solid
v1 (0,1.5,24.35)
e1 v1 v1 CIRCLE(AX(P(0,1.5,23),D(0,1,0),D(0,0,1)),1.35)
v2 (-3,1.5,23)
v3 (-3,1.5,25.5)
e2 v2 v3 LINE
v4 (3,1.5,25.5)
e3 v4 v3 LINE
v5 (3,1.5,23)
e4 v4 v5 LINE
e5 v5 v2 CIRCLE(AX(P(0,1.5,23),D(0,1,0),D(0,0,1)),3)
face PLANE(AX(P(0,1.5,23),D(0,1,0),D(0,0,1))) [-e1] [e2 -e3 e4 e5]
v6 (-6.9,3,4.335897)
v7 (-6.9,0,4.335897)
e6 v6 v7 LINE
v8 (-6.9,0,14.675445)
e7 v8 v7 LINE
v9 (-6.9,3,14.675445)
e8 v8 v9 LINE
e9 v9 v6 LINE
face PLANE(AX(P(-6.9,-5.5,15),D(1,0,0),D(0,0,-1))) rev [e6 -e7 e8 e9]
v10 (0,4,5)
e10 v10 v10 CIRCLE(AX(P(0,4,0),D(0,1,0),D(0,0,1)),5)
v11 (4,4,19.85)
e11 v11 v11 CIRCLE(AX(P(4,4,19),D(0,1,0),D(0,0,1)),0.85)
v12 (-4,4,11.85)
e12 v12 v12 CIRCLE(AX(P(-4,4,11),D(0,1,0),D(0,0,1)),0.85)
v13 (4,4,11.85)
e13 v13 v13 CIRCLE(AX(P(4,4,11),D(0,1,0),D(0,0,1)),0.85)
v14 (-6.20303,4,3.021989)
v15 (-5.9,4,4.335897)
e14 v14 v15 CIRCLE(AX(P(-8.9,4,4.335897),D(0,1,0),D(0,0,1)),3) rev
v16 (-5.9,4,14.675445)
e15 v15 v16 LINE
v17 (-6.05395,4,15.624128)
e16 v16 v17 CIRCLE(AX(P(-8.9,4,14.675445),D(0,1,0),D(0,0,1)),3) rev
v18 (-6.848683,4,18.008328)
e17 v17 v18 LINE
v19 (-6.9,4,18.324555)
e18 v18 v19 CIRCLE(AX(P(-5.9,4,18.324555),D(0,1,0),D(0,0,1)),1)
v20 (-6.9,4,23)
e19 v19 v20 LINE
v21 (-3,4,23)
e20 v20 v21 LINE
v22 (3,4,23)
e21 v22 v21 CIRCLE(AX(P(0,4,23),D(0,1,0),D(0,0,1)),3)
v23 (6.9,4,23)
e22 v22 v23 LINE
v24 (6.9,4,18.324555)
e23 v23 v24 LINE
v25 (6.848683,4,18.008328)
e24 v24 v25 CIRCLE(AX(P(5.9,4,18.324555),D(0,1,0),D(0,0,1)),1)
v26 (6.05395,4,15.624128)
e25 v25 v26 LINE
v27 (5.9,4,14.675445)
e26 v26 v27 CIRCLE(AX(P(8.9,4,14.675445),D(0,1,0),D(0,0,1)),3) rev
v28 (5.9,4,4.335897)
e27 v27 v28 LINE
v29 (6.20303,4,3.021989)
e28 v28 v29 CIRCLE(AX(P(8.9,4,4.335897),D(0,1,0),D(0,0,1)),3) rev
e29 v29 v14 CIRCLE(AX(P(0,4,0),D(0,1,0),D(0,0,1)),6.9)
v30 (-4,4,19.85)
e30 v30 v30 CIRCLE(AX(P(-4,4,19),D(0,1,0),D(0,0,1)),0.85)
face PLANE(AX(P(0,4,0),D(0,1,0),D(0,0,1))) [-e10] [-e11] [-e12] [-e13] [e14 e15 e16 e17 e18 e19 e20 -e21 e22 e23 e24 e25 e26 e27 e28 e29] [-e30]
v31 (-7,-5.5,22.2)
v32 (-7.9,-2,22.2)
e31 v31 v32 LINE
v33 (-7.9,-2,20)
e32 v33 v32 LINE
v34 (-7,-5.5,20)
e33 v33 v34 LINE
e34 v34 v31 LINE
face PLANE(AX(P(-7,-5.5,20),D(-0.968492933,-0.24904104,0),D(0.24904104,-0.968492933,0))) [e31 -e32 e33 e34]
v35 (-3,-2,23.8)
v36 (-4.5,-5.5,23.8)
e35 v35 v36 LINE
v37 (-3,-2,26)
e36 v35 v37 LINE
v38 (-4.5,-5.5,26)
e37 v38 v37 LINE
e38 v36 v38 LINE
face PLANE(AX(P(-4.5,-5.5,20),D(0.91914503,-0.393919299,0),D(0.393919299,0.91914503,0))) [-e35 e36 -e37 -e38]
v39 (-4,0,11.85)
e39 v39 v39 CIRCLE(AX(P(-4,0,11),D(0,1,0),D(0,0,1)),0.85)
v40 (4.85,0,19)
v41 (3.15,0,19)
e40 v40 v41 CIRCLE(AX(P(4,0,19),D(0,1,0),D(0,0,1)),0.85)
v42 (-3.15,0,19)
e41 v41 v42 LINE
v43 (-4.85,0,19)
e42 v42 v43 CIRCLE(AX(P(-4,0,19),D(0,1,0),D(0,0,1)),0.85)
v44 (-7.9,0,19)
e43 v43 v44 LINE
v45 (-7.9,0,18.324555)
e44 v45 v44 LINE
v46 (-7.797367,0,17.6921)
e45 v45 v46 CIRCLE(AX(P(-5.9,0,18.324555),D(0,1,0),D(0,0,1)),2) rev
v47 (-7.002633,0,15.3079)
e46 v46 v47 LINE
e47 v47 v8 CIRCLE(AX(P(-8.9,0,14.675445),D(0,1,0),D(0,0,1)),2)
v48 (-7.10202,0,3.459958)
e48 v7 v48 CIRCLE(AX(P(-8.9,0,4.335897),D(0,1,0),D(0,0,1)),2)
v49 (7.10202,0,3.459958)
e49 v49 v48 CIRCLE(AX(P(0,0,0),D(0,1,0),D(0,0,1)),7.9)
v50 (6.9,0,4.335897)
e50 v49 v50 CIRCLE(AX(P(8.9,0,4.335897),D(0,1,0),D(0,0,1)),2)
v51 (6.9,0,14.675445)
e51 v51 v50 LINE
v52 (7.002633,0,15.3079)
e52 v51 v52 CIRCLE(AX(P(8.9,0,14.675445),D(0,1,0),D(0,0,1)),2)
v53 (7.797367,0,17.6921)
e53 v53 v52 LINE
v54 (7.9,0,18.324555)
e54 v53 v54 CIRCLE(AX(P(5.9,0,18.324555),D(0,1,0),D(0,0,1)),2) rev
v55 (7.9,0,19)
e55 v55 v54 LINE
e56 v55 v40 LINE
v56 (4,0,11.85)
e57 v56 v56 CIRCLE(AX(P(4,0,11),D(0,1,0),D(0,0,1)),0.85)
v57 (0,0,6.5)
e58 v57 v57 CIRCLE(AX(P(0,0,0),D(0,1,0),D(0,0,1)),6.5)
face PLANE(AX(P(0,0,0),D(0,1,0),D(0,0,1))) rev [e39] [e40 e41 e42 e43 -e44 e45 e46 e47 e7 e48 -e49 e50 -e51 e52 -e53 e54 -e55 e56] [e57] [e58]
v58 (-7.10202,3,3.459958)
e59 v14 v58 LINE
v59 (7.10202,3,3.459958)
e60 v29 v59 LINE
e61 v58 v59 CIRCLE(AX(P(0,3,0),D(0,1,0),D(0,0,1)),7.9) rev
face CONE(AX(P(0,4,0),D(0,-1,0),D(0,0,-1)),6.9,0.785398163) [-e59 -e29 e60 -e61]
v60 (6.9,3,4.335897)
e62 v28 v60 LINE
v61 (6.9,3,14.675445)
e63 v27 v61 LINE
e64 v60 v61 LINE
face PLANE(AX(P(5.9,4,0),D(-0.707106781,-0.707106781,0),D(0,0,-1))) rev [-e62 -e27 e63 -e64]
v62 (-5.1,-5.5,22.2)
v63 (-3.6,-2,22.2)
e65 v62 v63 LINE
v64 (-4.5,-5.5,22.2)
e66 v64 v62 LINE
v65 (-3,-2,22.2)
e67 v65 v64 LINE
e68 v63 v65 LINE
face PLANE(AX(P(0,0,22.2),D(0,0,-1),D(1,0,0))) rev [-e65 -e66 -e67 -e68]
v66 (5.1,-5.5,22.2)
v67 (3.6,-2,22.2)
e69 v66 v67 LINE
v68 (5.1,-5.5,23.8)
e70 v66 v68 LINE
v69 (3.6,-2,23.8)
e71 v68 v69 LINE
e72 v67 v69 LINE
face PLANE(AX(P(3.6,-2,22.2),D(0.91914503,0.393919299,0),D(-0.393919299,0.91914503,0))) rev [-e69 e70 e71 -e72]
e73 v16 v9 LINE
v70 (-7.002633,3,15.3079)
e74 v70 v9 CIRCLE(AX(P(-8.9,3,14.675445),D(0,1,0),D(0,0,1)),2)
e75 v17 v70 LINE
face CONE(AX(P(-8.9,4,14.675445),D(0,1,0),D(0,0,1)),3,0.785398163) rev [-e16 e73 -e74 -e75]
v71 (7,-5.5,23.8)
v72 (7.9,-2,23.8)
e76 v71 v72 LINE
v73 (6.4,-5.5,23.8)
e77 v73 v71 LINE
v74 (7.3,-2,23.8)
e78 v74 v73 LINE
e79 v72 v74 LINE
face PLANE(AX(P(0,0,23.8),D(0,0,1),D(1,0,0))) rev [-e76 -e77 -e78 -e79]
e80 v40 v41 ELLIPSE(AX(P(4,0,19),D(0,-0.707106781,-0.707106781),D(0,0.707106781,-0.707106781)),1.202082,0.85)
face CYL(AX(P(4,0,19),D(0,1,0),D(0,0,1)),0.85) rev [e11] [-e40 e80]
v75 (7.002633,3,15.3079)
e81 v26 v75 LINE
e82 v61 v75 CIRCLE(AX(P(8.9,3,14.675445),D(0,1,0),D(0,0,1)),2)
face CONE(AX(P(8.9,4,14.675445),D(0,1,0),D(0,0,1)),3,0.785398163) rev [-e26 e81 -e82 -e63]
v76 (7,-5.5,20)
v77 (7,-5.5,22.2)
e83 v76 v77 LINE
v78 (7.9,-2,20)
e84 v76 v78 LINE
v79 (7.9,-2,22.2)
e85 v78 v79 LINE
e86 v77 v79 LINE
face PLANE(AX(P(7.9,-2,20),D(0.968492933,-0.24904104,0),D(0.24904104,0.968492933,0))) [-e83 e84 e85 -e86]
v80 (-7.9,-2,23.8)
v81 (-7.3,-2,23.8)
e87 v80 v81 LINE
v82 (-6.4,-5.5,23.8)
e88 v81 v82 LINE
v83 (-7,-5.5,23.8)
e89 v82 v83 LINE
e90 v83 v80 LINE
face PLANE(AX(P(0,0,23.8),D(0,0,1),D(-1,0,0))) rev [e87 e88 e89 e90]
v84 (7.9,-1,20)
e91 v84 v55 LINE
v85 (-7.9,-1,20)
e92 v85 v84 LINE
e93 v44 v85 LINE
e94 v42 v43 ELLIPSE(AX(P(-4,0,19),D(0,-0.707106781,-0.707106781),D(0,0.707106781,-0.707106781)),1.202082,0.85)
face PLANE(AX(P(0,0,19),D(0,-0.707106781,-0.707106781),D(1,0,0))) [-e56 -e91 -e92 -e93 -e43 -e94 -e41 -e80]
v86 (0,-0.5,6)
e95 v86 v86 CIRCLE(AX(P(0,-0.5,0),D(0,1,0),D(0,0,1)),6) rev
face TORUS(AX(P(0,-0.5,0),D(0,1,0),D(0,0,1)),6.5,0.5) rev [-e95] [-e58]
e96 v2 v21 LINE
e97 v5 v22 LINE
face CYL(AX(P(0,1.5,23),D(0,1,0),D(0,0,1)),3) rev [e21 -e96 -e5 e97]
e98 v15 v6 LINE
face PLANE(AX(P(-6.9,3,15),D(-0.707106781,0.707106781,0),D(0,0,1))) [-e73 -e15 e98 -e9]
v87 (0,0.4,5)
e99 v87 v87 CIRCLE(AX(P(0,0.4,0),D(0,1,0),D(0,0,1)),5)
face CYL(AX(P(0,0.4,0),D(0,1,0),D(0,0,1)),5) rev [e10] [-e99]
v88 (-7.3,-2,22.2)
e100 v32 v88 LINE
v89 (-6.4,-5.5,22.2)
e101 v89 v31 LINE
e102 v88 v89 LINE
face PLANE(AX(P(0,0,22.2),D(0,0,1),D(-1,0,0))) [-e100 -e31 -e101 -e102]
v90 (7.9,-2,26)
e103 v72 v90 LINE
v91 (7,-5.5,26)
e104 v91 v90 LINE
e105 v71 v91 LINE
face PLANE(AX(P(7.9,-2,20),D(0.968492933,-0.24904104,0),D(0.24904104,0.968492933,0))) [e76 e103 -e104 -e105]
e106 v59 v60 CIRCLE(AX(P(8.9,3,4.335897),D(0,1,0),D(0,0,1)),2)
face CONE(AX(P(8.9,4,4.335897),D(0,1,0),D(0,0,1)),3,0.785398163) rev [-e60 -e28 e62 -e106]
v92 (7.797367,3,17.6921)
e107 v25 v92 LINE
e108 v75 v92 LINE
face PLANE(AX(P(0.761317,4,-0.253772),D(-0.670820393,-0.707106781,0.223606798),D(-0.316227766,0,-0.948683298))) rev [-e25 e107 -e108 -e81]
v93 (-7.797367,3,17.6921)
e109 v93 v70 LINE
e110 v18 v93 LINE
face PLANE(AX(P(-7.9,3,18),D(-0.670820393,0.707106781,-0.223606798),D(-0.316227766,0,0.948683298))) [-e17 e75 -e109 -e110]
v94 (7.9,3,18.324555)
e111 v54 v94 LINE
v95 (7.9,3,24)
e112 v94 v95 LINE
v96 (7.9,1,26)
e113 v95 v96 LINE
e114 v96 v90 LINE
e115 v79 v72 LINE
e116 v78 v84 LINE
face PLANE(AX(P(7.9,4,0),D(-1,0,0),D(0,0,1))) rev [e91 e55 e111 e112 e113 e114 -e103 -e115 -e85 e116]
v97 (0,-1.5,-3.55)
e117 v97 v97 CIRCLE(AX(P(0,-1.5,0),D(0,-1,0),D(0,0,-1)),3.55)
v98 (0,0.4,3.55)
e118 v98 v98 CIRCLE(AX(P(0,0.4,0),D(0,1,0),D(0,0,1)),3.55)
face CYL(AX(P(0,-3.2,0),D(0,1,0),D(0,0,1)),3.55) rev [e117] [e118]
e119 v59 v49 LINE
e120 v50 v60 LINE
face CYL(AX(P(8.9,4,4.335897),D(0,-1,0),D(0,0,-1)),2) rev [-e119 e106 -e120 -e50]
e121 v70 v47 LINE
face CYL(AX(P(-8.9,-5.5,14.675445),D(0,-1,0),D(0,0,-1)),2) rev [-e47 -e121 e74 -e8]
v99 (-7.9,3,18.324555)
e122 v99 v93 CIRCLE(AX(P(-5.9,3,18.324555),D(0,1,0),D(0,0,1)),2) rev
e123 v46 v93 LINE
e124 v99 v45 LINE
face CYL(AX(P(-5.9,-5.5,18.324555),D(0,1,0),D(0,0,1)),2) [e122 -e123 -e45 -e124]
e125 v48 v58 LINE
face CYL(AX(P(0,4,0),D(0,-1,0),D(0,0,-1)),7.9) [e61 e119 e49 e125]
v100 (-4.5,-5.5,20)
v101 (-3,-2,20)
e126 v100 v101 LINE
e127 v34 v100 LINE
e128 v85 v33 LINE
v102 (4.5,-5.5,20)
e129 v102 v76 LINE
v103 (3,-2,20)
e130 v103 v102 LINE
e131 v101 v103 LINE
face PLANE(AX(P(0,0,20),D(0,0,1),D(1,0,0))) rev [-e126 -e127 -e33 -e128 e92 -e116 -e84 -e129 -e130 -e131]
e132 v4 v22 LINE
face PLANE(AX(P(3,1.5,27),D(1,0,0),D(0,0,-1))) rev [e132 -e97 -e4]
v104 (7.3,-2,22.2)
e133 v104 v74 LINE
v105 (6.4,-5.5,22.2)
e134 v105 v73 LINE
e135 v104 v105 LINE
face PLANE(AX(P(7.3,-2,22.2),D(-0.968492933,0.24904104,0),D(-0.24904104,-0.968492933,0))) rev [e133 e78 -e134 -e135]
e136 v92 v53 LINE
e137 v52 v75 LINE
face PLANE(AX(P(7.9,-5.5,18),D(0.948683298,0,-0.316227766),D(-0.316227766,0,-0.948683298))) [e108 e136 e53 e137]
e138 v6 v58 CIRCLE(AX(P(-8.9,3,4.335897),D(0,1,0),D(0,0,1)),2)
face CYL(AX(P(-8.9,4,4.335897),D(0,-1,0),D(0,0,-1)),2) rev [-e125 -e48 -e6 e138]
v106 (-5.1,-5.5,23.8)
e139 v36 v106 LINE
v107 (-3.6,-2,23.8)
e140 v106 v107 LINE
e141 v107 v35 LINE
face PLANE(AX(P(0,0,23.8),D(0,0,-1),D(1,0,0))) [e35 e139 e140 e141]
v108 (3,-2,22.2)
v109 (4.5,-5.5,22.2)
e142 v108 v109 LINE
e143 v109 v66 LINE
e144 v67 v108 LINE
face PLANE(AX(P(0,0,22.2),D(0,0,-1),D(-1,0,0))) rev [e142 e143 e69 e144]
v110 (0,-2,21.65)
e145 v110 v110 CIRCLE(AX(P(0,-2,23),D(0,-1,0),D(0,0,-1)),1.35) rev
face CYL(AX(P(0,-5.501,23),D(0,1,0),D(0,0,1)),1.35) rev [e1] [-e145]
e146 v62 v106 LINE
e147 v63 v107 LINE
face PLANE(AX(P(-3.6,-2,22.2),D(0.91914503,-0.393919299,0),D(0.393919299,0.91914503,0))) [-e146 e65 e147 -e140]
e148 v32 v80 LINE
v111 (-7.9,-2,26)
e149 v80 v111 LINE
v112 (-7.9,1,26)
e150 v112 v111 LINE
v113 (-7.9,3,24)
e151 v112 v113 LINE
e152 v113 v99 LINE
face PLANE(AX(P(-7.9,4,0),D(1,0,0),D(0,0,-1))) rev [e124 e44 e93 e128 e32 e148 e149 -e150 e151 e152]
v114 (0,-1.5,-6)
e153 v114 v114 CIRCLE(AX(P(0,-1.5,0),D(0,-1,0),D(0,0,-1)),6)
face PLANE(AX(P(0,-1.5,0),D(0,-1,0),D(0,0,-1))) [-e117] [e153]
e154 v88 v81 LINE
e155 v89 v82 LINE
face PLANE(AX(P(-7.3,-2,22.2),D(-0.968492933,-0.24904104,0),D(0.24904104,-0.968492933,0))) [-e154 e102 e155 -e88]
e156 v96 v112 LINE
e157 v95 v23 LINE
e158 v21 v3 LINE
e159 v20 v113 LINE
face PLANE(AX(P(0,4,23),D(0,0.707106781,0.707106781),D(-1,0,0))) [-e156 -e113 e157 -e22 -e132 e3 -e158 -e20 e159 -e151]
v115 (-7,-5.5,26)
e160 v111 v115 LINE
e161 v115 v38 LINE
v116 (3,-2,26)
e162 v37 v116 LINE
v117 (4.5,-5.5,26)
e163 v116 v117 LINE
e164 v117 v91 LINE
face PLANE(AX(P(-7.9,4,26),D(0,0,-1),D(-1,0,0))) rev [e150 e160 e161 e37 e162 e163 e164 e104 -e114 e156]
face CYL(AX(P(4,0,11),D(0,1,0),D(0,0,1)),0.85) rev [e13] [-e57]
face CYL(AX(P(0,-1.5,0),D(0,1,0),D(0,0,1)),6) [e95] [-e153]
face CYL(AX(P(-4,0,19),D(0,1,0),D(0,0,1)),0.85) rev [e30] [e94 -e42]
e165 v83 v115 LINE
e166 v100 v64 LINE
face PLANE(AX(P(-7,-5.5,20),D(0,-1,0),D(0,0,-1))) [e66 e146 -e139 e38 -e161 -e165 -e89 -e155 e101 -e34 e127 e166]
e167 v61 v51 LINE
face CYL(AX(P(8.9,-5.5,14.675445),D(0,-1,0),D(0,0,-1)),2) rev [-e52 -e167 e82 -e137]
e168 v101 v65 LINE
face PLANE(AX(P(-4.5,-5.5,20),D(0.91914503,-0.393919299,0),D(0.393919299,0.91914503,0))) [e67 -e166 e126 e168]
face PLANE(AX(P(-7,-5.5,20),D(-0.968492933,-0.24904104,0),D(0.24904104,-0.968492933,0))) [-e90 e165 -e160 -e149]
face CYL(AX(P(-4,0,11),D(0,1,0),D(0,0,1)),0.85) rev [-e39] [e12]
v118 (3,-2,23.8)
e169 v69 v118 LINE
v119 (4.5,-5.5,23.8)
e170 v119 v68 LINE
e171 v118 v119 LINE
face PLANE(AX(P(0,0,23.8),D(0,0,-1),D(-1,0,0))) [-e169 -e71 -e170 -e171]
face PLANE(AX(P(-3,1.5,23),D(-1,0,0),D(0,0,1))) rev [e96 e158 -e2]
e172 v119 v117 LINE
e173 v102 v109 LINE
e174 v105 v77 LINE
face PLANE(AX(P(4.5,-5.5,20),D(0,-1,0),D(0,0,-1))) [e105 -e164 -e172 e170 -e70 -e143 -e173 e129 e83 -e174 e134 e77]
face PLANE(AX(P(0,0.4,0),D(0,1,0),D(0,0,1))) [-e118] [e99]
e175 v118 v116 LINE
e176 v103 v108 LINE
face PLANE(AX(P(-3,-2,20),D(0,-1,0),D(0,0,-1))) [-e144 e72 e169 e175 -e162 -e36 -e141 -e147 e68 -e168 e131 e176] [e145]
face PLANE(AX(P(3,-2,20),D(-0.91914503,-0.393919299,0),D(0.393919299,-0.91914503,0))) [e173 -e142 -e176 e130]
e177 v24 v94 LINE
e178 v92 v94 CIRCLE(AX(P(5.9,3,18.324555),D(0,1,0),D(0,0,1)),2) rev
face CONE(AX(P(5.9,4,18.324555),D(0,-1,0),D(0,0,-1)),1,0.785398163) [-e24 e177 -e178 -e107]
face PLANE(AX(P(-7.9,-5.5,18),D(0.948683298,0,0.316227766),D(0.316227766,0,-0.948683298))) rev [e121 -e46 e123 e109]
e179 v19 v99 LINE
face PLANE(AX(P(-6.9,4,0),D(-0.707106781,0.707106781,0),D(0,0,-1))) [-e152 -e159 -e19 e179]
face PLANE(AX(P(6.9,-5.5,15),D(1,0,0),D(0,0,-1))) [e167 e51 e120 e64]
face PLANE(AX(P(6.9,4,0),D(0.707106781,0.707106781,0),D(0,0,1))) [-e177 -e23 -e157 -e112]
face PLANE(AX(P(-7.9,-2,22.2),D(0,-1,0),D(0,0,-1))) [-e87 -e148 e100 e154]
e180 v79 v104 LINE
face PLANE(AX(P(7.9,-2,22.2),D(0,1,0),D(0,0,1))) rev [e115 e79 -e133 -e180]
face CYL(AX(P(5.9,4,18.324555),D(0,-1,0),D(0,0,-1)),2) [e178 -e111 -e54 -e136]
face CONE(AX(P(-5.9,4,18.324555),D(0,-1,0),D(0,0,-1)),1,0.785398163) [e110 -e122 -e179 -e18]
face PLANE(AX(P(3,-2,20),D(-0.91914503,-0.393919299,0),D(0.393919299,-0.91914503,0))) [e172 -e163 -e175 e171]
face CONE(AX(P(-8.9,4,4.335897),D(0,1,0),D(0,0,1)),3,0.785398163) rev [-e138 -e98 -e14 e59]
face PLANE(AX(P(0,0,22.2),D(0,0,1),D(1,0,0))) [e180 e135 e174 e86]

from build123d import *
from build123d.topology import SkipClean

# Parameters (mm, degrees)
EXTRUDE_1_DEPTH        = 4
EXTRUDE_3_DEPTH        = 6
CHAMFER_1_SIZE         = 3
SKETCH_5_R             = 0.85
CUT_EXTRUDE_1_DEPTH    = 4
PATTERN_LINEAR_1_COUNT = 2
PATTERN_LINEAR_1_PITCH = 8
CUT_EXTRUDE_2_DEPTH    = 2.5
CUT_EXTRUDE_3_REACH    = 30.061
SKETCH_7_R             = 1.35
SKETCH_8_R             = 6
EXTRUDE_4_DEPTH        = 1.5
FILLET_1_R             = 0.5
SKETCH_9_R             = 5
CUT_EXTRUDE_4_DEPTH    = 3.6
SKETCH_10_R            = 3.55
CUT_EXTRUDE_5_DEPTH    = 3.6
CUT_EXTRUDE_6_DEPTH    = 0.8
CUT_EXTRUDE_7_DEPTH    = 29.786455148
FILLET_2_R             = 2
CHAMFER_2_SIZE         = 1


with BuildPart() as part:
    # ｽｹｯﾁ1 → ﾎﾞｽ - 押し出し1 (new body)
    with BuildSketch(Plane(origin=(0, 0, 0), x_dir=(1, 0, 0), z_dir=(0, 1, 0))):
        with BuildLine():
            Line((-7.9, 0), (-7.9, -26))
            Line((-7.9, -26), (7.9, -26))
            Line((7.9, -26), (7.9, 0))
            ThreePointArc((7.9, 0), (0, 7.9), (-7.9, 0))
        make_face()
    extrude(amount=EXTRUDE_1_DEPTH)

    # ｽｹｯﾁ4 → ﾎﾞｽ - 押し出し3 (add)
    with BuildSketch(Plane.XY.offset(26)):
        Polygon((-7, -5.5), (-4.5, -5.5), (-3, -2), (3, -2), (4.5, -5.5), (7, -5.5), (7.9, -2), (7.9, 0), (-7.9, 0), (-7.9, -2), align=None)
    extrude(amount=-EXTRUDE_3_DEPTH)

    # 面取り1
    chamfer_1_edges = [part.edges().sort_by_distance(p)[0] for p in [
        (0, 4, 26),
    ]]
    chamfer(chamfer_1_edges, length=CHAMFER_1_SIZE)

    # ｽｹｯﾁ5 → ｶｯﾄ - 押し出し1 (cut)
    with BuildSketch(Plane(origin=(0, 4, 0), x_dir=(1, 0, 0), z_dir=(0, 1, 0))):
        with Locations(Location((-4, -19, 0), (0, 0, 270))):
            Circle(SKETCH_5_R)
        with Locations(Location((4, -19, 0), (0, 0, 270))):
            Circle(SKETCH_5_R)
    cut_extrude_1 = extrude(amount=-CUT_EXTRUDE_1_DEPTH, mode=Mode.SUBTRACT)

    # 直線ﾊﾟﾀｰﾝ1: ｶｯﾄ - 押し出し1 ×2
    with Locations(*[(0, 0, -i * PATTERN_LINEAR_1_PITCH) for i in range(1, PATTERN_LINEAR_1_COUNT)]):
        add(cut_extrude_1, mode=Mode.SUBTRACT)

    # ｽｹｯﾁ6 → ｶｯﾄ - 押し出し2 (cut)
    with BuildSketch(Plane(origin=(0, 4, 0), x_dir=(1, 0, 0), z_dir=(0, 1, 0))):
        with BuildLine():
            Line((-3, -23), (-3, -27))
            Line((-3, -27), (3, -27))
            Line((3, -27), (3, -23))
            ThreePointArc((3, -23), (0, -20), (-3, -23))
        make_face()
    extrude(amount=-CUT_EXTRUDE_2_DEPTH, mode=Mode.SUBTRACT)

    # ｽｹｯﾁ7 → ｶｯﾄ - 押し出し3 (cut, up to next)
    with BuildSketch(Plane(origin=(0, 1.5, 0), x_dir=(1, 0, 0), z_dir=(0, 1, 0)), mode=Mode.PRIVATE) as cut_extrude_3_sk1:
        with Locations(Location((0, -23, 0), (0, 0, 270))):
            Circle(SKETCH_7_R)
    cut_extrude_3_tool1 = extrude(cut_extrude_3_sk1.sketch, amount=-CUT_EXTRUDE_3_REACH, mode=Mode.PRIVATE) & part.part
    add(cut_extrude_3_tool1.solids().sort_by_distance((0, 1.5, 23))[0], mode=Mode.SUBTRACT)

    # ｽｹｯﾁ8 → ﾎﾞｽ - 押し出し4 (add)
    with BuildSketch(Plane.XZ):
        with Locations(Location((0, 0, 0), (0, 0, 90))):
            Circle(SKETCH_8_R)
    extrude(amount=EXTRUDE_4_DEPTH)

    # ﾌｨﾚｯﾄ1
    fillet_1_edges = [part.edges().sort_by_distance(p)[0] for p in [
        (0, 0, -6),
    ]]
    fillet(fillet_1_edges, radius=FILLET_1_R)

    # ｽｹｯﾁ9 → ｶｯﾄ - 押し出し4 (cut)
    with BuildSketch(Plane(origin=(0, 4, 0), x_dir=(1, 0, 0), z_dir=(0, 1, 0))):
        with Locations(Location((0, 0, 0), (0, 0, 270))):
            Circle(SKETCH_9_R)
    extrude(amount=-CUT_EXTRUDE_4_DEPTH, mode=Mode.SUBTRACT)

    # ｽｹｯﾁ10 → ｶｯﾄ - 押し出し5 (cut)
    with BuildSketch(Plane(origin=(0, 0.4, 0), x_dir=(1, 0, 0), z_dir=(0, 1, 0))):
        with Locations(Location((0, 0, 0), (0, 0, 270))):
            Circle(SKETCH_10_R)
    extrude(amount=-CUT_EXTRUDE_5_DEPTH, mode=Mode.SUBTRACT)

    # ｽｹｯﾁ11 → ｶｯﾄ - 押し出し6 (cut, symmetric)
    with BuildSketch(Plane.XY.offset(23)):
        Polygon((3, -2), (4.5, -5.5), (5.1, -5.5), (3.6, -2), align=None)
        Polygon((7.9, -2), (7, -5.5), (6.4, -5.5), (7.3, -2), align=None)
    cut_extrude_6 = extrude(amount=CUT_EXTRUDE_6_DEPTH, both=True, mode=Mode.SUBTRACT)

    # ﾐﾗｰ1: ｶｯﾄ - 押し出し6 across plane
    add(cut_extrude_6.mirror(Plane(origin=(0, 0, 0), x_dir=(0, 0, 1), z_dir=(1, 0, 0))), mode=Mode.SUBTRACT)

    # ｽｹｯﾁ12 → ｶｯﾄ - 押し出し7 (cut, through all)
    with SkipClean():  # the faces are left unmerged after this step: merging them gives an invalid solid
        with BuildSketch(Plane(origin=(0, 4, 0), x_dir=(1, 0, 0), z_dir=(0, 1, 0))):
            with BuildLine():
                Line((-7.9, -18), (-6.9, -15))
                Line((-6.9, -15), (-6.9, -3.847076812))
                ThreePointArc((-6.9, -3.847076812), (-7.645913941, -1.987460691), (-7.9, 0))
                Line((-7.9, 0), (-7.9, -18))
            make_face()
        cut_extrude_7 = extrude(amount=-CUT_EXTRUDE_7_DEPTH, mode=Mode.SUBTRACT)

    # ﾐﾗｰ2: ｶｯﾄ - 押し出し7 across plane
    with SkipClean():  # the faces are left unmerged after this step: merging them gives an invalid solid
        add(cut_extrude_7.mirror(Plane(origin=(0, 0, 0), x_dir=(0, 0, 1), z_dir=(1, 0, 0))), mode=Mode.SUBTRACT)

    # ﾌｨﾚｯﾄ2
    fillet_2_edges = [part.edges().sort_by_distance(p)[0] for p in [
        (-7.9, 2, 18),
        (-6.9, 2, 3.847076812),
        (-6.9, 2, 15),
        (7.9, 2, 18),
        (6.9, 2, 15),
        (6.9, 2, 3.847076812),
    ]]
    fillet(fillet_2_edges, radius=FILLET_2_R)

    # 面取り2
    # the kernel refuses this chamfer: 1 mm, written as the material it adds along each edge
    with BuildSketch(Plane(origin=(7.9, 0, 20), x_dir=(0, 0.02749587661058639, -0.9996219169112968), z_dir=(-1, 0, 0))) as chamfer_2_piece_1_section:
        Polygon((CHAMFER_2_SIZE * 0.999621916911, CHAMFER_2_SIZE * 0.0274958766106), (-CHAMFER_2_SIZE * 0.0274958766106, CHAMFER_2_SIZE * 0.999621916911), (0, 0), align=None)
    chamfer_2_piece_1 = extrude(amount=15.8, mode=Mode.PRIVATE)
    chamfer_2_piece_1 = chamfer_2_piece_1 - Plane(origin=(-4, -0.34097177, 19), x_dir=(0, 0, 1), z_dir=(0, 1, 0)) * Cylinder(0.85, 36, mode=Mode.PRIVATE)
    chamfer_2_piece_1 = chamfer_2_piece_1 - Plane(origin=(4, -0.34097177, 19), x_dir=(0, 0, 1), z_dir=(0, 1, 0)) * Cylinder(0.85, 36, mode=Mode.PRIVATE)
    add(chamfer_2_piece_1)
    # the kernel refuses this chamfer: 1 mm, written as the material it takes off along each edge
    with BuildSketch(Plane(origin=(-7.9, 4, 18.32455532), x_dir=(-0.027495876610586487, -0.9996219169112968, 0), z_dir=(0, 0, 1)), Plane(origin=(7.9, 4, 25.571682988), x_dir=(0.027495876610586487, -0.9996219169112968, 0), z_dir=(0, 0, -1))) as chamfer_2_2_piece_1:
        Polygon((CHAMFER_2_SIZE * 0.999621916911, CHAMFER_2_SIZE * 0.0274958766106), (-CHAMFER_2_SIZE * 0.0274958766106, CHAMFER_2_SIZE * 0.999621916911), (0, 0), align=None)
    extrude(amount=7.247127668, mode=Mode.SUBTRACT)
    with BuildSketch(Plane(origin=(0, 4, 0), x_dir=(1, 0, 0), z_dir=(0, 0, 1))) as chamfer_2_2_piece_2:
        Polygon((7.9, -CHAMFER_2_SIZE), (7.9 - CHAMFER_2_SIZE, 0), (7.9, 0), align=None)
    revolve(axis=Axis((0, 4, 0), (0, 1, 0)), revolution_arc=180, mode=Mode.SUBTRACT)
    with BuildSketch(Plane(origin=(-5.9, 4, 18.32455532), x_dir=(-1, 0, 0), z_dir=(0, 0, 1))) as chamfer_2_2_piece_3:
        Polygon((2, CHAMFER_2_SIZE), (2 - CHAMFER_2_SIZE, 0), (2, 0), align=None)
    revolve(axis=Axis((-5.9, 4, 18.32455532), (0, -1, 0)), revolution_arc=18.434948823, mode=Mode.SUBTRACT)
    with BuildSketch(Plane(origin=(-7.797366596, 4, 17.692099788), x_dir=(-0.026084878905720917, -0.9996219169112968, -0.008694959635240323), z_dir=(0.31622776601683844, 0, -0.9486832980505137))) as chamfer_2_2_piece_4:
        Polygon((CHAMFER_2_SIZE * 0.999621916911, -CHAMFER_2_SIZE * 0.0274958766106), (-CHAMFER_2_SIZE * 0.0274958766106, -CHAMFER_2_SIZE * 0.999621916911), (0, 0), align=None)
    extrude(amount=2.513167019, mode=Mode.SUBTRACT)
    with BuildSketch(Plane(origin=(-8.9, 4, 14.67544468), x_dir=(0.9486832980505138, 0, 0.31622776601683794), z_dir=(-0.31622776601683794, 0, 0.9486832980505138))) as chamfer_2_2_piece_5:
        Polygon((2, -CHAMFER_2_SIZE), (2 + CHAMFER_2_SIZE, 0), (2, 0), align=None)
    revolve(axis=Axis((-8.9, 4, 14.67544468), (0, 1, 0)), revolution_arc=18.434948823, mode=Mode.SUBTRACT)
    with BuildSketch(Plane(origin=(-6.9, 4, 14.67544468), x_dir=(-0.027495876610586487, -0.9996219169112968, 0), z_dir=(0, 0, -1))) as chamfer_2_2_piece_6:
        Polygon((CHAMFER_2_SIZE * 0.999621916911, -CHAMFER_2_SIZE * 0.0274958766106), (-CHAMFER_2_SIZE * 0.0274958766106, -CHAMFER_2_SIZE * 0.999621916911), (0, 0), align=None)
    extrude(amount=10.339548002, mode=Mode.SUBTRACT)
    with BuildSketch(Plane(origin=(-8.9, 4, 4.335896678), x_dir=(1, 0, 0), z_dir=(0, 0, 1))) as chamfer_2_2_piece_7:
        Polygon((2, -CHAMFER_2_SIZE), (2 + CHAMFER_2_SIZE, 0), (2, 0), align=None)
    revolve(axis=Axis((-8.9, 4, 4.335896678), (0, 1, 0)), revolution_arc=25.974390018, mode=Mode.SUBTRACT)
    with BuildSketch(Plane(origin=(8.9, 4, 4.335896678), x_dir=(-0.8989898989898989, 0, -0.43796936138745074), z_dir=(0.43796936138745074, 0, -0.8989898989898989))) as chamfer_2_2_piece_8:
        Polygon((2, -CHAMFER_2_SIZE), (2 + CHAMFER_2_SIZE, 0), (2, 0), align=None)
    revolve(axis=Axis((8.9, 4, 4.335896678), (0, 1, 0)), revolution_arc=25.974390018, mode=Mode.SUBTRACT)
    with BuildSketch(Plane(origin=(6.9, 4, 14.67544468), x_dir=(0.027495876610586487, -0.9996219169112968, 0), z_dir=(0, 0, -1))) as chamfer_2_2_piece_9:
        Polygon((CHAMFER_2_SIZE * 0.999621916911, CHAMFER_2_SIZE * 0.0274958766106), (-CHAMFER_2_SIZE * 0.0274958766106, CHAMFER_2_SIZE * 0.999621916911), (0, 0), align=None)
    extrude(amount=10.339548002, mode=Mode.SUBTRACT)
    with BuildSketch(Plane(origin=(8.9, 4, 14.67544468), x_dir=(-1, 0, 0), z_dir=(0, 0, -1))) as chamfer_2_2_piece_10:
        Polygon((2, -CHAMFER_2_SIZE), (2 + CHAMFER_2_SIZE, 0), (2, 0), align=None)
    revolve(axis=Axis((8.9, 4, 14.67544468), (0, 1, 0)), revolution_arc=18.434948823, mode=Mode.SUBTRACT)
    with BuildSketch(Plane(origin=(7.797366596, 4, 17.692099788), x_dir=(0.026084878905720917, -0.9996219169112968, -0.008694959635240323), z_dir=(-0.31622776601683844, 0, -0.9486832980505137))) as chamfer_2_2_piece_11:
        Polygon((CHAMFER_2_SIZE * 0.999621916911, CHAMFER_2_SIZE * 0.0274958766106), (-CHAMFER_2_SIZE * 0.0274958766106, CHAMFER_2_SIZE * 0.999621916911), (0, 0), align=None)
    extrude(amount=2.513167019, mode=Mode.SUBTRACT)
    with BuildSketch(Plane(origin=(5.9, 4, 18.32455532), x_dir=(0.9486832980505135, 0, -0.3162277660168389), z_dir=(-0.3162277660168389, 0, -0.9486832980505135))) as chamfer_2_2_piece_12:
        Polygon((2, CHAMFER_2_SIZE), (2 - CHAMFER_2_SIZE, 0), (2, 0), align=None)
    revolve(axis=Axis((5.9, 4, 18.32455532), (0, -1, 0)), revolution_arc=18.434948823, mode=Mode.SUBTRACT)
    with BuildSketch(Plane(origin=(0, 4, 0), x_dir=(0.898989898989899, 0, 0.4379693613874505), z_dir=(-0.4379693613874505, 0, 0.898989898989899))) as chamfer_2_2_piece_13:
        Polygon((7.9, -CHAMFER_2_SIZE), (7.9 - CHAMFER_2_SIZE, 0), (7.9, 0), align=None)
    revolve(axis=Axis((0, 4, 0), (0, 1, 0)), revolution_arc=25.974390018, mode=Mode.SUBTRACT)
    with BuildSketch(Plane(origin=(0, 4, 0), x_dir=(-0.898989898989899, 0, 0.4379693613874506), z_dir=(0.4379693613874506, 0, 0.898989898989899))) as chamfer_2_2_piece_14:
        Polygon((7.9, CHAMFER_2_SIZE), (7.9 - CHAMFER_2_SIZE, 0), (7.9, 0), align=None)
    revolve(axis=Axis((0, 4, 0), (0, -1, 0)), revolution_arc=25.974390018, mode=Mode.SUBTRACT)


solid = part.part
